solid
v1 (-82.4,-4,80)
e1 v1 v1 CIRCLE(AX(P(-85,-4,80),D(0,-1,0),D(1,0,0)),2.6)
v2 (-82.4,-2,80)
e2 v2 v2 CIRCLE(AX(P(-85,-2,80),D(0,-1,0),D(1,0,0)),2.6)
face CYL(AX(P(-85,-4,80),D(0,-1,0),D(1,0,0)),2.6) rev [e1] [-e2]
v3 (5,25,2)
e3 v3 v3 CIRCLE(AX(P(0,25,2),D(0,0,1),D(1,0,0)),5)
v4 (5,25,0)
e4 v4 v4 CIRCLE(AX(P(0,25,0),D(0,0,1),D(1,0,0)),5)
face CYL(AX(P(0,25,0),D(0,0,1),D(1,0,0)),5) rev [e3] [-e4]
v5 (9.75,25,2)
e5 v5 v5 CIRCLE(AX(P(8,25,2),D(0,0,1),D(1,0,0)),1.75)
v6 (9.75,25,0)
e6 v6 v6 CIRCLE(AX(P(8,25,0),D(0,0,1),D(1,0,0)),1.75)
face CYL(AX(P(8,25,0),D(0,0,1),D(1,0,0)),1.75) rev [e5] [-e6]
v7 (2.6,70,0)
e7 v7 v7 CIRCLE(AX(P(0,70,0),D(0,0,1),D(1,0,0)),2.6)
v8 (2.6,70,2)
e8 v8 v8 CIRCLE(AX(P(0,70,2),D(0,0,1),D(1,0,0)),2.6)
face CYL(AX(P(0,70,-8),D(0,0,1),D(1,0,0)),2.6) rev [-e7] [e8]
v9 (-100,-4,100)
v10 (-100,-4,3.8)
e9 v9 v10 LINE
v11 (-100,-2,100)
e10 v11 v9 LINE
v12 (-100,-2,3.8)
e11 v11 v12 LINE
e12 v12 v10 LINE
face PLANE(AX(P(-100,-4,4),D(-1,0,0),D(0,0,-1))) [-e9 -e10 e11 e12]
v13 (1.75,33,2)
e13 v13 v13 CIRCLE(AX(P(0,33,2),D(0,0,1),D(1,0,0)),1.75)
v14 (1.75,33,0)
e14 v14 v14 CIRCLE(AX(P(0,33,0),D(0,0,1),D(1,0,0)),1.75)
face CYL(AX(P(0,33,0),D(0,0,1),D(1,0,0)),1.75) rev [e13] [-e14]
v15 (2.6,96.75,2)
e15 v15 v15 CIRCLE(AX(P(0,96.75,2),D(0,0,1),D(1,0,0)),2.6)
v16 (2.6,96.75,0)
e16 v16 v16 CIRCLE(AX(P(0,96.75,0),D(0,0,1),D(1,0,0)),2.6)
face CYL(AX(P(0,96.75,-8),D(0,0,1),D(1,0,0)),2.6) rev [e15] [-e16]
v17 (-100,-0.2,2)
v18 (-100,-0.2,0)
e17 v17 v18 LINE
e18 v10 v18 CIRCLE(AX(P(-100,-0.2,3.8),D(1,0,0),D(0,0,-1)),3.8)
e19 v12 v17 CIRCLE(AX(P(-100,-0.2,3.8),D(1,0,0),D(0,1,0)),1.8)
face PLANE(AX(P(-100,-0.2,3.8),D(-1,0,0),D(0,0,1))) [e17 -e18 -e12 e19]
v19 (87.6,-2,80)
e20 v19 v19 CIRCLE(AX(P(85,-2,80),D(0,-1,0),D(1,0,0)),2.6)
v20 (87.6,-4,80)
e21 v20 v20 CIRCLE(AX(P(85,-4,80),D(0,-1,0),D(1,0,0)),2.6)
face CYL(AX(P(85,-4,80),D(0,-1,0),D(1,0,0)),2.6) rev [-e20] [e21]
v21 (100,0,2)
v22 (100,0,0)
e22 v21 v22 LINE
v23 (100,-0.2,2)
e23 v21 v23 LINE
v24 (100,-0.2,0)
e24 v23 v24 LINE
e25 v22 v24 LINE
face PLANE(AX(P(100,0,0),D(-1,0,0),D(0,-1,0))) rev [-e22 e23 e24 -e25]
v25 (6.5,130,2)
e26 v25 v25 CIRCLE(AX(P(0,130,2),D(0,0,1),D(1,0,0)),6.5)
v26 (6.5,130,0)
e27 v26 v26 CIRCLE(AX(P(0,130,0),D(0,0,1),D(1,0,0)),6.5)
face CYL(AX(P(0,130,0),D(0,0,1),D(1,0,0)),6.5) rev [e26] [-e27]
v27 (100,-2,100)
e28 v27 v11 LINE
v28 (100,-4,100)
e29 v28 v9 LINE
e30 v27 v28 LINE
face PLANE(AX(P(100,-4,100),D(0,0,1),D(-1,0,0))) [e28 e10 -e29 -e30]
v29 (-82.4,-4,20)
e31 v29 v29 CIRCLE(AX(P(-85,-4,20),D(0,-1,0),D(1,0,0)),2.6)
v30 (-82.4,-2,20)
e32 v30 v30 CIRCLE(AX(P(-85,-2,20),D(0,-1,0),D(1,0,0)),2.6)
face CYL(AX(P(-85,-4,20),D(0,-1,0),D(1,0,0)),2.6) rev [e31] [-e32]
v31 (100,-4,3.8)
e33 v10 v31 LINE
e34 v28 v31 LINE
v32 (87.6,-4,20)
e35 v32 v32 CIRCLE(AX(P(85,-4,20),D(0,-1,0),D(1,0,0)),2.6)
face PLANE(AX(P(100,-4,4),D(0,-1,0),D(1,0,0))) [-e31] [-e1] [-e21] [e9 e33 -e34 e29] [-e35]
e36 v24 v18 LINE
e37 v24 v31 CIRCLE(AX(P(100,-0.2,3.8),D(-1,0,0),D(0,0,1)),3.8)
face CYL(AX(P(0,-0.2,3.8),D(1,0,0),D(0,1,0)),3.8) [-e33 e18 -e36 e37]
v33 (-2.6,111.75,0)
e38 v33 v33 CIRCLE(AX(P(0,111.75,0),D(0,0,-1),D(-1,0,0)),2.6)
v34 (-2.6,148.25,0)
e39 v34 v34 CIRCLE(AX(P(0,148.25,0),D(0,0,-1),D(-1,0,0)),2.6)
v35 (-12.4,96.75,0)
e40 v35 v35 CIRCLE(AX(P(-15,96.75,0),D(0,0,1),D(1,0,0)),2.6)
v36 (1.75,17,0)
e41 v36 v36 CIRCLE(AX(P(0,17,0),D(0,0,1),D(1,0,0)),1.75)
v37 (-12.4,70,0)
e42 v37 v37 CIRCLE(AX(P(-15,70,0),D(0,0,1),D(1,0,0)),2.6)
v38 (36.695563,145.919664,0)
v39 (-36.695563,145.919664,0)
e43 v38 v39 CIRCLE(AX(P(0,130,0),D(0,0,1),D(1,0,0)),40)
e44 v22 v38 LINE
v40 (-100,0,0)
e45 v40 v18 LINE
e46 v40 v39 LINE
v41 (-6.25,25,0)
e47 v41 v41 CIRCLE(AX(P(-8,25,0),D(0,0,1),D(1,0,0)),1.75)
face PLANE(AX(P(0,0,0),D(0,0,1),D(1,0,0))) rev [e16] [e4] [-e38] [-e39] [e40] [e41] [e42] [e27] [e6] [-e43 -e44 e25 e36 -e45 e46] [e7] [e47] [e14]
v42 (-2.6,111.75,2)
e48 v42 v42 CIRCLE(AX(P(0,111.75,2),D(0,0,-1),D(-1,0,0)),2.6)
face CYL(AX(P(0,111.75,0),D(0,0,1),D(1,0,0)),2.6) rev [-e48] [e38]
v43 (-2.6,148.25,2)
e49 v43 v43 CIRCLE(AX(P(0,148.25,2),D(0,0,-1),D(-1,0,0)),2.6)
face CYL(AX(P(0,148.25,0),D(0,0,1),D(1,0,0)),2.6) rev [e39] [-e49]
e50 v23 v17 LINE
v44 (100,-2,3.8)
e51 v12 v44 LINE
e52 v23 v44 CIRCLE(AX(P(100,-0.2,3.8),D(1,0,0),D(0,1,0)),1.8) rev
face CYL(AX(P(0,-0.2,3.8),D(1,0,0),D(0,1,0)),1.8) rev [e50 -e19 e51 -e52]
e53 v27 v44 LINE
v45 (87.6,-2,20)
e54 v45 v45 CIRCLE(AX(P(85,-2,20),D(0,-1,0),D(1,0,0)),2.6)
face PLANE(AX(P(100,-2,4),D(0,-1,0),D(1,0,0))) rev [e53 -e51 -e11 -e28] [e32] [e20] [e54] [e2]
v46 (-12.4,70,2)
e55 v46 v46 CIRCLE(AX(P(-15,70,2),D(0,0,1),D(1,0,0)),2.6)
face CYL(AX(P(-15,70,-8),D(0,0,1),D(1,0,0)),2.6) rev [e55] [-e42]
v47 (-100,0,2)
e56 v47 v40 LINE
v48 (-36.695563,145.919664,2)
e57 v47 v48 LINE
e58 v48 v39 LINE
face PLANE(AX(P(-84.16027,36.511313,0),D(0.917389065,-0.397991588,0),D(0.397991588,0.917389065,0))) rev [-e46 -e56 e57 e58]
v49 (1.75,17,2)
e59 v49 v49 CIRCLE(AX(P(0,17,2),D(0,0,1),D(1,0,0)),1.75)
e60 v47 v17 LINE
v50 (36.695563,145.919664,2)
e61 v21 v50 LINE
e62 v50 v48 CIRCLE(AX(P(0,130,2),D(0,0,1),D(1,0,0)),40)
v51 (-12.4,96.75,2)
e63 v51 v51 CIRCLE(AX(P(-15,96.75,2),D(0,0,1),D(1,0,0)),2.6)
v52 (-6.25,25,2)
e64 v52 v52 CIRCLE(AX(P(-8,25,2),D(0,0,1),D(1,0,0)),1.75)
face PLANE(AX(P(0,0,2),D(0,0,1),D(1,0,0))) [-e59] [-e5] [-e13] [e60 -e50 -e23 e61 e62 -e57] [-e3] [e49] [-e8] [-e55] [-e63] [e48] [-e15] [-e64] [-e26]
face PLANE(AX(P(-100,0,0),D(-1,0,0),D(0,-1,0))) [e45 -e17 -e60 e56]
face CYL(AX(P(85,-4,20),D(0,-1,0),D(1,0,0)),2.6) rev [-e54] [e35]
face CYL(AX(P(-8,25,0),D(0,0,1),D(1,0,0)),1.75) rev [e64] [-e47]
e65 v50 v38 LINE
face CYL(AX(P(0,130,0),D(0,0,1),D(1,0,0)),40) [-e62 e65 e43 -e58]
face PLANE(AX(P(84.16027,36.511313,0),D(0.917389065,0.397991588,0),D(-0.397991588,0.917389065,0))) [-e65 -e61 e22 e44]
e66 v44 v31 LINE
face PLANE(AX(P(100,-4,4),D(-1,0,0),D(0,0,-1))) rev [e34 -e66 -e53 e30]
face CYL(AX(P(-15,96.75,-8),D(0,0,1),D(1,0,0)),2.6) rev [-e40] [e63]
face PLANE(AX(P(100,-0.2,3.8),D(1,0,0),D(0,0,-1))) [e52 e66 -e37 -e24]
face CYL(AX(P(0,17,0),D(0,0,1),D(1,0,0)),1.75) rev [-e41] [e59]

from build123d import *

# Parameters (mm, degrees)
SKETCH1_R            = 6.5
BOSS_EXTRUDE1_DEPTH  = 4
SKETCH4_R            = 2.6
CUT_EXTRUDE1_DEPTH   = 10
SKETCH5_W            = 200
SKETCH5_H            = 4
BOSS_EXTRUDE2_DEPTH  = 100
SKETCH8_R            = 2.6
CUT_EXTRUDE2_DEPTH   = 100
SKETCH9_R            = 5
SKETCH9_R_2          = 1.75
CUT_EXTRUDE3_DEPTH   = 10
CONVERT_SOLID3_START = -100
CONVERT_SOLID3_DEPTH = 200
SKETCH11_R           = 2.6
CUT_EXTRUDE4_DEPTH   = 10


# Read off the part's stored shape, not the designer's step: Convert-Solid3
with BuildPart() as part:
    # Sketch1 → Boss-Extrude1 (new body)
    with BuildSketch(Plane.XY):
        with BuildLine():
            Line((100, -4), (100, 0))
            Line((100, 0), (36.695562583, 145.919663525))
            ThreePointArc((36.695562583, 145.919663525), (0, 170), (-36.695562583, 145.919663525))
            Line((-36.695562583, 145.919663525), (-100, 0))
            Line((-100, 0), (-100, -4))
            Line((-100, -4), (100, -4))
        make_face()
        with Locations((0, 130)):
            Circle(SKETCH1_R, mode=Mode.SUBTRACT)
    extrude(amount=BOSS_EXTRUDE1_DEPTH)

    # Sketch4 → Cut-Extrude1 (cut)
    with BuildSketch(Plane(origin=(0, 0, 0), x_dir=(-1, 0, 0), z_dir=(0, 0, -1))):
        with Locations((0, 111.75)):
            Circle(SKETCH4_R)
        with Locations((0, 148.25)):
            Circle(SKETCH4_R)
    extrude(amount=-CUT_EXTRUDE1_DEPTH, mode=Mode.SUBTRACT)

    # Sketch5 → Boss-Extrude2 (add)
    with BuildSketch(Plane(origin=(0, 0, 0), x_dir=(-1, 0, 0), z_dir=(0, 0, -1))):
        with Locations((0, -2)):
            Rectangle(SKETCH5_W, SKETCH5_H)
    extrude(amount=-BOSS_EXTRUDE2_DEPTH)

    # Sketch8 → Cut-Extrude2 (cut)
    with BuildSketch(Plane(origin=(0, 0, 0), x_dir=(1, 0, 0), z_dir=(0, 1, 0))):
        with Locations(Location((-85, -80, 0), (0, 0, 270))):
            Circle(SKETCH8_R)
        with Locations(Location((-85, -20, 0), (0, 0, 270))):
            Circle(SKETCH8_R)
        with Locations(Location((85, -80, 0), (0, 0, 270))):
            Circle(SKETCH8_R)
        with Locations(Location((85, -20, 0), (0, 0, 270))):
            Circle(SKETCH8_R)
    extrude(amount=-CUT_EXTRUDE2_DEPTH, mode=Mode.SUBTRACT)

    # Sketch9 → Cut-Extrude3 (cut)
    with BuildSketch(Plane.XY.offset(4)):
        with Locations((0, 25)):
            Circle(SKETCH9_R)
        with Locations((0, 33)):
            Circle(SKETCH9_R_2)
        with Locations((0, 17)):
            Circle(SKETCH9_R_2)
        with Locations((8, 25)):
            Circle(SKETCH9_R_2)
        with Locations((-8, 25)):
            Circle(SKETCH9_R_2)
    extrude(amount=-CUT_EXTRUDE3_DEPTH, mode=Mode.SUBTRACT)

    # Convert-Solid3 outline → Convert-Solid3 (cut)
    with BuildSketch(Plane.YZ.offset(CONVERT_SOLID3_START)):
        with BuildLine():
            ThreePointArc((-0.2, 0), (-2.887005769, 1.112994231), (-4, 3.8))
            Line((-4, 3.8), (-3.999999957, 100))
            Line((-3.999999957, 100), (-6, 100))
            Line((-6, 100), (-6, -1))
            Line((-6, -1), (171, -1))
            Line((171, -1), (171, 7.6e-08))
            Line((171, 7.6e-08), (-0.2, 0))
        make_face()
        with BuildLine():
            Line((0, 100), (-2, 100))
            Line((-2, 100), (-2, 3.8))
            ThreePointArc((-2, 3.8), (-1.472792206, 2.527207794), (-0.2, 2))
            Line((-0.2, 2), (171, 2))
            Line((171, 2), (171, 4))
            Line((171, 4), (0, 4))
            Line((0, 4), (0, 100))
        make_face()
    extrude(amount=CONVERT_SOLID3_DEPTH, mode=Mode.SUBTRACT)

    # Sketch11 → Cut-Extrude4 (cut)
    with BuildSketch(Plane.XY.offset(2)):
        with Locations((0, 70)):
            Circle(SKETCH11_R)
        with Locations((0, 96.75)):
            Circle(SKETCH11_R)
        with Locations((-15, 96.75)):
            Circle(SKETCH11_R)
        with Locations((-15, 70)):
            Circle(SKETCH11_R)
    extrude(amount=-CUT_EXTRUDE4_DEPTH, mode=Mode.SUBTRACT)


solid = part.part
